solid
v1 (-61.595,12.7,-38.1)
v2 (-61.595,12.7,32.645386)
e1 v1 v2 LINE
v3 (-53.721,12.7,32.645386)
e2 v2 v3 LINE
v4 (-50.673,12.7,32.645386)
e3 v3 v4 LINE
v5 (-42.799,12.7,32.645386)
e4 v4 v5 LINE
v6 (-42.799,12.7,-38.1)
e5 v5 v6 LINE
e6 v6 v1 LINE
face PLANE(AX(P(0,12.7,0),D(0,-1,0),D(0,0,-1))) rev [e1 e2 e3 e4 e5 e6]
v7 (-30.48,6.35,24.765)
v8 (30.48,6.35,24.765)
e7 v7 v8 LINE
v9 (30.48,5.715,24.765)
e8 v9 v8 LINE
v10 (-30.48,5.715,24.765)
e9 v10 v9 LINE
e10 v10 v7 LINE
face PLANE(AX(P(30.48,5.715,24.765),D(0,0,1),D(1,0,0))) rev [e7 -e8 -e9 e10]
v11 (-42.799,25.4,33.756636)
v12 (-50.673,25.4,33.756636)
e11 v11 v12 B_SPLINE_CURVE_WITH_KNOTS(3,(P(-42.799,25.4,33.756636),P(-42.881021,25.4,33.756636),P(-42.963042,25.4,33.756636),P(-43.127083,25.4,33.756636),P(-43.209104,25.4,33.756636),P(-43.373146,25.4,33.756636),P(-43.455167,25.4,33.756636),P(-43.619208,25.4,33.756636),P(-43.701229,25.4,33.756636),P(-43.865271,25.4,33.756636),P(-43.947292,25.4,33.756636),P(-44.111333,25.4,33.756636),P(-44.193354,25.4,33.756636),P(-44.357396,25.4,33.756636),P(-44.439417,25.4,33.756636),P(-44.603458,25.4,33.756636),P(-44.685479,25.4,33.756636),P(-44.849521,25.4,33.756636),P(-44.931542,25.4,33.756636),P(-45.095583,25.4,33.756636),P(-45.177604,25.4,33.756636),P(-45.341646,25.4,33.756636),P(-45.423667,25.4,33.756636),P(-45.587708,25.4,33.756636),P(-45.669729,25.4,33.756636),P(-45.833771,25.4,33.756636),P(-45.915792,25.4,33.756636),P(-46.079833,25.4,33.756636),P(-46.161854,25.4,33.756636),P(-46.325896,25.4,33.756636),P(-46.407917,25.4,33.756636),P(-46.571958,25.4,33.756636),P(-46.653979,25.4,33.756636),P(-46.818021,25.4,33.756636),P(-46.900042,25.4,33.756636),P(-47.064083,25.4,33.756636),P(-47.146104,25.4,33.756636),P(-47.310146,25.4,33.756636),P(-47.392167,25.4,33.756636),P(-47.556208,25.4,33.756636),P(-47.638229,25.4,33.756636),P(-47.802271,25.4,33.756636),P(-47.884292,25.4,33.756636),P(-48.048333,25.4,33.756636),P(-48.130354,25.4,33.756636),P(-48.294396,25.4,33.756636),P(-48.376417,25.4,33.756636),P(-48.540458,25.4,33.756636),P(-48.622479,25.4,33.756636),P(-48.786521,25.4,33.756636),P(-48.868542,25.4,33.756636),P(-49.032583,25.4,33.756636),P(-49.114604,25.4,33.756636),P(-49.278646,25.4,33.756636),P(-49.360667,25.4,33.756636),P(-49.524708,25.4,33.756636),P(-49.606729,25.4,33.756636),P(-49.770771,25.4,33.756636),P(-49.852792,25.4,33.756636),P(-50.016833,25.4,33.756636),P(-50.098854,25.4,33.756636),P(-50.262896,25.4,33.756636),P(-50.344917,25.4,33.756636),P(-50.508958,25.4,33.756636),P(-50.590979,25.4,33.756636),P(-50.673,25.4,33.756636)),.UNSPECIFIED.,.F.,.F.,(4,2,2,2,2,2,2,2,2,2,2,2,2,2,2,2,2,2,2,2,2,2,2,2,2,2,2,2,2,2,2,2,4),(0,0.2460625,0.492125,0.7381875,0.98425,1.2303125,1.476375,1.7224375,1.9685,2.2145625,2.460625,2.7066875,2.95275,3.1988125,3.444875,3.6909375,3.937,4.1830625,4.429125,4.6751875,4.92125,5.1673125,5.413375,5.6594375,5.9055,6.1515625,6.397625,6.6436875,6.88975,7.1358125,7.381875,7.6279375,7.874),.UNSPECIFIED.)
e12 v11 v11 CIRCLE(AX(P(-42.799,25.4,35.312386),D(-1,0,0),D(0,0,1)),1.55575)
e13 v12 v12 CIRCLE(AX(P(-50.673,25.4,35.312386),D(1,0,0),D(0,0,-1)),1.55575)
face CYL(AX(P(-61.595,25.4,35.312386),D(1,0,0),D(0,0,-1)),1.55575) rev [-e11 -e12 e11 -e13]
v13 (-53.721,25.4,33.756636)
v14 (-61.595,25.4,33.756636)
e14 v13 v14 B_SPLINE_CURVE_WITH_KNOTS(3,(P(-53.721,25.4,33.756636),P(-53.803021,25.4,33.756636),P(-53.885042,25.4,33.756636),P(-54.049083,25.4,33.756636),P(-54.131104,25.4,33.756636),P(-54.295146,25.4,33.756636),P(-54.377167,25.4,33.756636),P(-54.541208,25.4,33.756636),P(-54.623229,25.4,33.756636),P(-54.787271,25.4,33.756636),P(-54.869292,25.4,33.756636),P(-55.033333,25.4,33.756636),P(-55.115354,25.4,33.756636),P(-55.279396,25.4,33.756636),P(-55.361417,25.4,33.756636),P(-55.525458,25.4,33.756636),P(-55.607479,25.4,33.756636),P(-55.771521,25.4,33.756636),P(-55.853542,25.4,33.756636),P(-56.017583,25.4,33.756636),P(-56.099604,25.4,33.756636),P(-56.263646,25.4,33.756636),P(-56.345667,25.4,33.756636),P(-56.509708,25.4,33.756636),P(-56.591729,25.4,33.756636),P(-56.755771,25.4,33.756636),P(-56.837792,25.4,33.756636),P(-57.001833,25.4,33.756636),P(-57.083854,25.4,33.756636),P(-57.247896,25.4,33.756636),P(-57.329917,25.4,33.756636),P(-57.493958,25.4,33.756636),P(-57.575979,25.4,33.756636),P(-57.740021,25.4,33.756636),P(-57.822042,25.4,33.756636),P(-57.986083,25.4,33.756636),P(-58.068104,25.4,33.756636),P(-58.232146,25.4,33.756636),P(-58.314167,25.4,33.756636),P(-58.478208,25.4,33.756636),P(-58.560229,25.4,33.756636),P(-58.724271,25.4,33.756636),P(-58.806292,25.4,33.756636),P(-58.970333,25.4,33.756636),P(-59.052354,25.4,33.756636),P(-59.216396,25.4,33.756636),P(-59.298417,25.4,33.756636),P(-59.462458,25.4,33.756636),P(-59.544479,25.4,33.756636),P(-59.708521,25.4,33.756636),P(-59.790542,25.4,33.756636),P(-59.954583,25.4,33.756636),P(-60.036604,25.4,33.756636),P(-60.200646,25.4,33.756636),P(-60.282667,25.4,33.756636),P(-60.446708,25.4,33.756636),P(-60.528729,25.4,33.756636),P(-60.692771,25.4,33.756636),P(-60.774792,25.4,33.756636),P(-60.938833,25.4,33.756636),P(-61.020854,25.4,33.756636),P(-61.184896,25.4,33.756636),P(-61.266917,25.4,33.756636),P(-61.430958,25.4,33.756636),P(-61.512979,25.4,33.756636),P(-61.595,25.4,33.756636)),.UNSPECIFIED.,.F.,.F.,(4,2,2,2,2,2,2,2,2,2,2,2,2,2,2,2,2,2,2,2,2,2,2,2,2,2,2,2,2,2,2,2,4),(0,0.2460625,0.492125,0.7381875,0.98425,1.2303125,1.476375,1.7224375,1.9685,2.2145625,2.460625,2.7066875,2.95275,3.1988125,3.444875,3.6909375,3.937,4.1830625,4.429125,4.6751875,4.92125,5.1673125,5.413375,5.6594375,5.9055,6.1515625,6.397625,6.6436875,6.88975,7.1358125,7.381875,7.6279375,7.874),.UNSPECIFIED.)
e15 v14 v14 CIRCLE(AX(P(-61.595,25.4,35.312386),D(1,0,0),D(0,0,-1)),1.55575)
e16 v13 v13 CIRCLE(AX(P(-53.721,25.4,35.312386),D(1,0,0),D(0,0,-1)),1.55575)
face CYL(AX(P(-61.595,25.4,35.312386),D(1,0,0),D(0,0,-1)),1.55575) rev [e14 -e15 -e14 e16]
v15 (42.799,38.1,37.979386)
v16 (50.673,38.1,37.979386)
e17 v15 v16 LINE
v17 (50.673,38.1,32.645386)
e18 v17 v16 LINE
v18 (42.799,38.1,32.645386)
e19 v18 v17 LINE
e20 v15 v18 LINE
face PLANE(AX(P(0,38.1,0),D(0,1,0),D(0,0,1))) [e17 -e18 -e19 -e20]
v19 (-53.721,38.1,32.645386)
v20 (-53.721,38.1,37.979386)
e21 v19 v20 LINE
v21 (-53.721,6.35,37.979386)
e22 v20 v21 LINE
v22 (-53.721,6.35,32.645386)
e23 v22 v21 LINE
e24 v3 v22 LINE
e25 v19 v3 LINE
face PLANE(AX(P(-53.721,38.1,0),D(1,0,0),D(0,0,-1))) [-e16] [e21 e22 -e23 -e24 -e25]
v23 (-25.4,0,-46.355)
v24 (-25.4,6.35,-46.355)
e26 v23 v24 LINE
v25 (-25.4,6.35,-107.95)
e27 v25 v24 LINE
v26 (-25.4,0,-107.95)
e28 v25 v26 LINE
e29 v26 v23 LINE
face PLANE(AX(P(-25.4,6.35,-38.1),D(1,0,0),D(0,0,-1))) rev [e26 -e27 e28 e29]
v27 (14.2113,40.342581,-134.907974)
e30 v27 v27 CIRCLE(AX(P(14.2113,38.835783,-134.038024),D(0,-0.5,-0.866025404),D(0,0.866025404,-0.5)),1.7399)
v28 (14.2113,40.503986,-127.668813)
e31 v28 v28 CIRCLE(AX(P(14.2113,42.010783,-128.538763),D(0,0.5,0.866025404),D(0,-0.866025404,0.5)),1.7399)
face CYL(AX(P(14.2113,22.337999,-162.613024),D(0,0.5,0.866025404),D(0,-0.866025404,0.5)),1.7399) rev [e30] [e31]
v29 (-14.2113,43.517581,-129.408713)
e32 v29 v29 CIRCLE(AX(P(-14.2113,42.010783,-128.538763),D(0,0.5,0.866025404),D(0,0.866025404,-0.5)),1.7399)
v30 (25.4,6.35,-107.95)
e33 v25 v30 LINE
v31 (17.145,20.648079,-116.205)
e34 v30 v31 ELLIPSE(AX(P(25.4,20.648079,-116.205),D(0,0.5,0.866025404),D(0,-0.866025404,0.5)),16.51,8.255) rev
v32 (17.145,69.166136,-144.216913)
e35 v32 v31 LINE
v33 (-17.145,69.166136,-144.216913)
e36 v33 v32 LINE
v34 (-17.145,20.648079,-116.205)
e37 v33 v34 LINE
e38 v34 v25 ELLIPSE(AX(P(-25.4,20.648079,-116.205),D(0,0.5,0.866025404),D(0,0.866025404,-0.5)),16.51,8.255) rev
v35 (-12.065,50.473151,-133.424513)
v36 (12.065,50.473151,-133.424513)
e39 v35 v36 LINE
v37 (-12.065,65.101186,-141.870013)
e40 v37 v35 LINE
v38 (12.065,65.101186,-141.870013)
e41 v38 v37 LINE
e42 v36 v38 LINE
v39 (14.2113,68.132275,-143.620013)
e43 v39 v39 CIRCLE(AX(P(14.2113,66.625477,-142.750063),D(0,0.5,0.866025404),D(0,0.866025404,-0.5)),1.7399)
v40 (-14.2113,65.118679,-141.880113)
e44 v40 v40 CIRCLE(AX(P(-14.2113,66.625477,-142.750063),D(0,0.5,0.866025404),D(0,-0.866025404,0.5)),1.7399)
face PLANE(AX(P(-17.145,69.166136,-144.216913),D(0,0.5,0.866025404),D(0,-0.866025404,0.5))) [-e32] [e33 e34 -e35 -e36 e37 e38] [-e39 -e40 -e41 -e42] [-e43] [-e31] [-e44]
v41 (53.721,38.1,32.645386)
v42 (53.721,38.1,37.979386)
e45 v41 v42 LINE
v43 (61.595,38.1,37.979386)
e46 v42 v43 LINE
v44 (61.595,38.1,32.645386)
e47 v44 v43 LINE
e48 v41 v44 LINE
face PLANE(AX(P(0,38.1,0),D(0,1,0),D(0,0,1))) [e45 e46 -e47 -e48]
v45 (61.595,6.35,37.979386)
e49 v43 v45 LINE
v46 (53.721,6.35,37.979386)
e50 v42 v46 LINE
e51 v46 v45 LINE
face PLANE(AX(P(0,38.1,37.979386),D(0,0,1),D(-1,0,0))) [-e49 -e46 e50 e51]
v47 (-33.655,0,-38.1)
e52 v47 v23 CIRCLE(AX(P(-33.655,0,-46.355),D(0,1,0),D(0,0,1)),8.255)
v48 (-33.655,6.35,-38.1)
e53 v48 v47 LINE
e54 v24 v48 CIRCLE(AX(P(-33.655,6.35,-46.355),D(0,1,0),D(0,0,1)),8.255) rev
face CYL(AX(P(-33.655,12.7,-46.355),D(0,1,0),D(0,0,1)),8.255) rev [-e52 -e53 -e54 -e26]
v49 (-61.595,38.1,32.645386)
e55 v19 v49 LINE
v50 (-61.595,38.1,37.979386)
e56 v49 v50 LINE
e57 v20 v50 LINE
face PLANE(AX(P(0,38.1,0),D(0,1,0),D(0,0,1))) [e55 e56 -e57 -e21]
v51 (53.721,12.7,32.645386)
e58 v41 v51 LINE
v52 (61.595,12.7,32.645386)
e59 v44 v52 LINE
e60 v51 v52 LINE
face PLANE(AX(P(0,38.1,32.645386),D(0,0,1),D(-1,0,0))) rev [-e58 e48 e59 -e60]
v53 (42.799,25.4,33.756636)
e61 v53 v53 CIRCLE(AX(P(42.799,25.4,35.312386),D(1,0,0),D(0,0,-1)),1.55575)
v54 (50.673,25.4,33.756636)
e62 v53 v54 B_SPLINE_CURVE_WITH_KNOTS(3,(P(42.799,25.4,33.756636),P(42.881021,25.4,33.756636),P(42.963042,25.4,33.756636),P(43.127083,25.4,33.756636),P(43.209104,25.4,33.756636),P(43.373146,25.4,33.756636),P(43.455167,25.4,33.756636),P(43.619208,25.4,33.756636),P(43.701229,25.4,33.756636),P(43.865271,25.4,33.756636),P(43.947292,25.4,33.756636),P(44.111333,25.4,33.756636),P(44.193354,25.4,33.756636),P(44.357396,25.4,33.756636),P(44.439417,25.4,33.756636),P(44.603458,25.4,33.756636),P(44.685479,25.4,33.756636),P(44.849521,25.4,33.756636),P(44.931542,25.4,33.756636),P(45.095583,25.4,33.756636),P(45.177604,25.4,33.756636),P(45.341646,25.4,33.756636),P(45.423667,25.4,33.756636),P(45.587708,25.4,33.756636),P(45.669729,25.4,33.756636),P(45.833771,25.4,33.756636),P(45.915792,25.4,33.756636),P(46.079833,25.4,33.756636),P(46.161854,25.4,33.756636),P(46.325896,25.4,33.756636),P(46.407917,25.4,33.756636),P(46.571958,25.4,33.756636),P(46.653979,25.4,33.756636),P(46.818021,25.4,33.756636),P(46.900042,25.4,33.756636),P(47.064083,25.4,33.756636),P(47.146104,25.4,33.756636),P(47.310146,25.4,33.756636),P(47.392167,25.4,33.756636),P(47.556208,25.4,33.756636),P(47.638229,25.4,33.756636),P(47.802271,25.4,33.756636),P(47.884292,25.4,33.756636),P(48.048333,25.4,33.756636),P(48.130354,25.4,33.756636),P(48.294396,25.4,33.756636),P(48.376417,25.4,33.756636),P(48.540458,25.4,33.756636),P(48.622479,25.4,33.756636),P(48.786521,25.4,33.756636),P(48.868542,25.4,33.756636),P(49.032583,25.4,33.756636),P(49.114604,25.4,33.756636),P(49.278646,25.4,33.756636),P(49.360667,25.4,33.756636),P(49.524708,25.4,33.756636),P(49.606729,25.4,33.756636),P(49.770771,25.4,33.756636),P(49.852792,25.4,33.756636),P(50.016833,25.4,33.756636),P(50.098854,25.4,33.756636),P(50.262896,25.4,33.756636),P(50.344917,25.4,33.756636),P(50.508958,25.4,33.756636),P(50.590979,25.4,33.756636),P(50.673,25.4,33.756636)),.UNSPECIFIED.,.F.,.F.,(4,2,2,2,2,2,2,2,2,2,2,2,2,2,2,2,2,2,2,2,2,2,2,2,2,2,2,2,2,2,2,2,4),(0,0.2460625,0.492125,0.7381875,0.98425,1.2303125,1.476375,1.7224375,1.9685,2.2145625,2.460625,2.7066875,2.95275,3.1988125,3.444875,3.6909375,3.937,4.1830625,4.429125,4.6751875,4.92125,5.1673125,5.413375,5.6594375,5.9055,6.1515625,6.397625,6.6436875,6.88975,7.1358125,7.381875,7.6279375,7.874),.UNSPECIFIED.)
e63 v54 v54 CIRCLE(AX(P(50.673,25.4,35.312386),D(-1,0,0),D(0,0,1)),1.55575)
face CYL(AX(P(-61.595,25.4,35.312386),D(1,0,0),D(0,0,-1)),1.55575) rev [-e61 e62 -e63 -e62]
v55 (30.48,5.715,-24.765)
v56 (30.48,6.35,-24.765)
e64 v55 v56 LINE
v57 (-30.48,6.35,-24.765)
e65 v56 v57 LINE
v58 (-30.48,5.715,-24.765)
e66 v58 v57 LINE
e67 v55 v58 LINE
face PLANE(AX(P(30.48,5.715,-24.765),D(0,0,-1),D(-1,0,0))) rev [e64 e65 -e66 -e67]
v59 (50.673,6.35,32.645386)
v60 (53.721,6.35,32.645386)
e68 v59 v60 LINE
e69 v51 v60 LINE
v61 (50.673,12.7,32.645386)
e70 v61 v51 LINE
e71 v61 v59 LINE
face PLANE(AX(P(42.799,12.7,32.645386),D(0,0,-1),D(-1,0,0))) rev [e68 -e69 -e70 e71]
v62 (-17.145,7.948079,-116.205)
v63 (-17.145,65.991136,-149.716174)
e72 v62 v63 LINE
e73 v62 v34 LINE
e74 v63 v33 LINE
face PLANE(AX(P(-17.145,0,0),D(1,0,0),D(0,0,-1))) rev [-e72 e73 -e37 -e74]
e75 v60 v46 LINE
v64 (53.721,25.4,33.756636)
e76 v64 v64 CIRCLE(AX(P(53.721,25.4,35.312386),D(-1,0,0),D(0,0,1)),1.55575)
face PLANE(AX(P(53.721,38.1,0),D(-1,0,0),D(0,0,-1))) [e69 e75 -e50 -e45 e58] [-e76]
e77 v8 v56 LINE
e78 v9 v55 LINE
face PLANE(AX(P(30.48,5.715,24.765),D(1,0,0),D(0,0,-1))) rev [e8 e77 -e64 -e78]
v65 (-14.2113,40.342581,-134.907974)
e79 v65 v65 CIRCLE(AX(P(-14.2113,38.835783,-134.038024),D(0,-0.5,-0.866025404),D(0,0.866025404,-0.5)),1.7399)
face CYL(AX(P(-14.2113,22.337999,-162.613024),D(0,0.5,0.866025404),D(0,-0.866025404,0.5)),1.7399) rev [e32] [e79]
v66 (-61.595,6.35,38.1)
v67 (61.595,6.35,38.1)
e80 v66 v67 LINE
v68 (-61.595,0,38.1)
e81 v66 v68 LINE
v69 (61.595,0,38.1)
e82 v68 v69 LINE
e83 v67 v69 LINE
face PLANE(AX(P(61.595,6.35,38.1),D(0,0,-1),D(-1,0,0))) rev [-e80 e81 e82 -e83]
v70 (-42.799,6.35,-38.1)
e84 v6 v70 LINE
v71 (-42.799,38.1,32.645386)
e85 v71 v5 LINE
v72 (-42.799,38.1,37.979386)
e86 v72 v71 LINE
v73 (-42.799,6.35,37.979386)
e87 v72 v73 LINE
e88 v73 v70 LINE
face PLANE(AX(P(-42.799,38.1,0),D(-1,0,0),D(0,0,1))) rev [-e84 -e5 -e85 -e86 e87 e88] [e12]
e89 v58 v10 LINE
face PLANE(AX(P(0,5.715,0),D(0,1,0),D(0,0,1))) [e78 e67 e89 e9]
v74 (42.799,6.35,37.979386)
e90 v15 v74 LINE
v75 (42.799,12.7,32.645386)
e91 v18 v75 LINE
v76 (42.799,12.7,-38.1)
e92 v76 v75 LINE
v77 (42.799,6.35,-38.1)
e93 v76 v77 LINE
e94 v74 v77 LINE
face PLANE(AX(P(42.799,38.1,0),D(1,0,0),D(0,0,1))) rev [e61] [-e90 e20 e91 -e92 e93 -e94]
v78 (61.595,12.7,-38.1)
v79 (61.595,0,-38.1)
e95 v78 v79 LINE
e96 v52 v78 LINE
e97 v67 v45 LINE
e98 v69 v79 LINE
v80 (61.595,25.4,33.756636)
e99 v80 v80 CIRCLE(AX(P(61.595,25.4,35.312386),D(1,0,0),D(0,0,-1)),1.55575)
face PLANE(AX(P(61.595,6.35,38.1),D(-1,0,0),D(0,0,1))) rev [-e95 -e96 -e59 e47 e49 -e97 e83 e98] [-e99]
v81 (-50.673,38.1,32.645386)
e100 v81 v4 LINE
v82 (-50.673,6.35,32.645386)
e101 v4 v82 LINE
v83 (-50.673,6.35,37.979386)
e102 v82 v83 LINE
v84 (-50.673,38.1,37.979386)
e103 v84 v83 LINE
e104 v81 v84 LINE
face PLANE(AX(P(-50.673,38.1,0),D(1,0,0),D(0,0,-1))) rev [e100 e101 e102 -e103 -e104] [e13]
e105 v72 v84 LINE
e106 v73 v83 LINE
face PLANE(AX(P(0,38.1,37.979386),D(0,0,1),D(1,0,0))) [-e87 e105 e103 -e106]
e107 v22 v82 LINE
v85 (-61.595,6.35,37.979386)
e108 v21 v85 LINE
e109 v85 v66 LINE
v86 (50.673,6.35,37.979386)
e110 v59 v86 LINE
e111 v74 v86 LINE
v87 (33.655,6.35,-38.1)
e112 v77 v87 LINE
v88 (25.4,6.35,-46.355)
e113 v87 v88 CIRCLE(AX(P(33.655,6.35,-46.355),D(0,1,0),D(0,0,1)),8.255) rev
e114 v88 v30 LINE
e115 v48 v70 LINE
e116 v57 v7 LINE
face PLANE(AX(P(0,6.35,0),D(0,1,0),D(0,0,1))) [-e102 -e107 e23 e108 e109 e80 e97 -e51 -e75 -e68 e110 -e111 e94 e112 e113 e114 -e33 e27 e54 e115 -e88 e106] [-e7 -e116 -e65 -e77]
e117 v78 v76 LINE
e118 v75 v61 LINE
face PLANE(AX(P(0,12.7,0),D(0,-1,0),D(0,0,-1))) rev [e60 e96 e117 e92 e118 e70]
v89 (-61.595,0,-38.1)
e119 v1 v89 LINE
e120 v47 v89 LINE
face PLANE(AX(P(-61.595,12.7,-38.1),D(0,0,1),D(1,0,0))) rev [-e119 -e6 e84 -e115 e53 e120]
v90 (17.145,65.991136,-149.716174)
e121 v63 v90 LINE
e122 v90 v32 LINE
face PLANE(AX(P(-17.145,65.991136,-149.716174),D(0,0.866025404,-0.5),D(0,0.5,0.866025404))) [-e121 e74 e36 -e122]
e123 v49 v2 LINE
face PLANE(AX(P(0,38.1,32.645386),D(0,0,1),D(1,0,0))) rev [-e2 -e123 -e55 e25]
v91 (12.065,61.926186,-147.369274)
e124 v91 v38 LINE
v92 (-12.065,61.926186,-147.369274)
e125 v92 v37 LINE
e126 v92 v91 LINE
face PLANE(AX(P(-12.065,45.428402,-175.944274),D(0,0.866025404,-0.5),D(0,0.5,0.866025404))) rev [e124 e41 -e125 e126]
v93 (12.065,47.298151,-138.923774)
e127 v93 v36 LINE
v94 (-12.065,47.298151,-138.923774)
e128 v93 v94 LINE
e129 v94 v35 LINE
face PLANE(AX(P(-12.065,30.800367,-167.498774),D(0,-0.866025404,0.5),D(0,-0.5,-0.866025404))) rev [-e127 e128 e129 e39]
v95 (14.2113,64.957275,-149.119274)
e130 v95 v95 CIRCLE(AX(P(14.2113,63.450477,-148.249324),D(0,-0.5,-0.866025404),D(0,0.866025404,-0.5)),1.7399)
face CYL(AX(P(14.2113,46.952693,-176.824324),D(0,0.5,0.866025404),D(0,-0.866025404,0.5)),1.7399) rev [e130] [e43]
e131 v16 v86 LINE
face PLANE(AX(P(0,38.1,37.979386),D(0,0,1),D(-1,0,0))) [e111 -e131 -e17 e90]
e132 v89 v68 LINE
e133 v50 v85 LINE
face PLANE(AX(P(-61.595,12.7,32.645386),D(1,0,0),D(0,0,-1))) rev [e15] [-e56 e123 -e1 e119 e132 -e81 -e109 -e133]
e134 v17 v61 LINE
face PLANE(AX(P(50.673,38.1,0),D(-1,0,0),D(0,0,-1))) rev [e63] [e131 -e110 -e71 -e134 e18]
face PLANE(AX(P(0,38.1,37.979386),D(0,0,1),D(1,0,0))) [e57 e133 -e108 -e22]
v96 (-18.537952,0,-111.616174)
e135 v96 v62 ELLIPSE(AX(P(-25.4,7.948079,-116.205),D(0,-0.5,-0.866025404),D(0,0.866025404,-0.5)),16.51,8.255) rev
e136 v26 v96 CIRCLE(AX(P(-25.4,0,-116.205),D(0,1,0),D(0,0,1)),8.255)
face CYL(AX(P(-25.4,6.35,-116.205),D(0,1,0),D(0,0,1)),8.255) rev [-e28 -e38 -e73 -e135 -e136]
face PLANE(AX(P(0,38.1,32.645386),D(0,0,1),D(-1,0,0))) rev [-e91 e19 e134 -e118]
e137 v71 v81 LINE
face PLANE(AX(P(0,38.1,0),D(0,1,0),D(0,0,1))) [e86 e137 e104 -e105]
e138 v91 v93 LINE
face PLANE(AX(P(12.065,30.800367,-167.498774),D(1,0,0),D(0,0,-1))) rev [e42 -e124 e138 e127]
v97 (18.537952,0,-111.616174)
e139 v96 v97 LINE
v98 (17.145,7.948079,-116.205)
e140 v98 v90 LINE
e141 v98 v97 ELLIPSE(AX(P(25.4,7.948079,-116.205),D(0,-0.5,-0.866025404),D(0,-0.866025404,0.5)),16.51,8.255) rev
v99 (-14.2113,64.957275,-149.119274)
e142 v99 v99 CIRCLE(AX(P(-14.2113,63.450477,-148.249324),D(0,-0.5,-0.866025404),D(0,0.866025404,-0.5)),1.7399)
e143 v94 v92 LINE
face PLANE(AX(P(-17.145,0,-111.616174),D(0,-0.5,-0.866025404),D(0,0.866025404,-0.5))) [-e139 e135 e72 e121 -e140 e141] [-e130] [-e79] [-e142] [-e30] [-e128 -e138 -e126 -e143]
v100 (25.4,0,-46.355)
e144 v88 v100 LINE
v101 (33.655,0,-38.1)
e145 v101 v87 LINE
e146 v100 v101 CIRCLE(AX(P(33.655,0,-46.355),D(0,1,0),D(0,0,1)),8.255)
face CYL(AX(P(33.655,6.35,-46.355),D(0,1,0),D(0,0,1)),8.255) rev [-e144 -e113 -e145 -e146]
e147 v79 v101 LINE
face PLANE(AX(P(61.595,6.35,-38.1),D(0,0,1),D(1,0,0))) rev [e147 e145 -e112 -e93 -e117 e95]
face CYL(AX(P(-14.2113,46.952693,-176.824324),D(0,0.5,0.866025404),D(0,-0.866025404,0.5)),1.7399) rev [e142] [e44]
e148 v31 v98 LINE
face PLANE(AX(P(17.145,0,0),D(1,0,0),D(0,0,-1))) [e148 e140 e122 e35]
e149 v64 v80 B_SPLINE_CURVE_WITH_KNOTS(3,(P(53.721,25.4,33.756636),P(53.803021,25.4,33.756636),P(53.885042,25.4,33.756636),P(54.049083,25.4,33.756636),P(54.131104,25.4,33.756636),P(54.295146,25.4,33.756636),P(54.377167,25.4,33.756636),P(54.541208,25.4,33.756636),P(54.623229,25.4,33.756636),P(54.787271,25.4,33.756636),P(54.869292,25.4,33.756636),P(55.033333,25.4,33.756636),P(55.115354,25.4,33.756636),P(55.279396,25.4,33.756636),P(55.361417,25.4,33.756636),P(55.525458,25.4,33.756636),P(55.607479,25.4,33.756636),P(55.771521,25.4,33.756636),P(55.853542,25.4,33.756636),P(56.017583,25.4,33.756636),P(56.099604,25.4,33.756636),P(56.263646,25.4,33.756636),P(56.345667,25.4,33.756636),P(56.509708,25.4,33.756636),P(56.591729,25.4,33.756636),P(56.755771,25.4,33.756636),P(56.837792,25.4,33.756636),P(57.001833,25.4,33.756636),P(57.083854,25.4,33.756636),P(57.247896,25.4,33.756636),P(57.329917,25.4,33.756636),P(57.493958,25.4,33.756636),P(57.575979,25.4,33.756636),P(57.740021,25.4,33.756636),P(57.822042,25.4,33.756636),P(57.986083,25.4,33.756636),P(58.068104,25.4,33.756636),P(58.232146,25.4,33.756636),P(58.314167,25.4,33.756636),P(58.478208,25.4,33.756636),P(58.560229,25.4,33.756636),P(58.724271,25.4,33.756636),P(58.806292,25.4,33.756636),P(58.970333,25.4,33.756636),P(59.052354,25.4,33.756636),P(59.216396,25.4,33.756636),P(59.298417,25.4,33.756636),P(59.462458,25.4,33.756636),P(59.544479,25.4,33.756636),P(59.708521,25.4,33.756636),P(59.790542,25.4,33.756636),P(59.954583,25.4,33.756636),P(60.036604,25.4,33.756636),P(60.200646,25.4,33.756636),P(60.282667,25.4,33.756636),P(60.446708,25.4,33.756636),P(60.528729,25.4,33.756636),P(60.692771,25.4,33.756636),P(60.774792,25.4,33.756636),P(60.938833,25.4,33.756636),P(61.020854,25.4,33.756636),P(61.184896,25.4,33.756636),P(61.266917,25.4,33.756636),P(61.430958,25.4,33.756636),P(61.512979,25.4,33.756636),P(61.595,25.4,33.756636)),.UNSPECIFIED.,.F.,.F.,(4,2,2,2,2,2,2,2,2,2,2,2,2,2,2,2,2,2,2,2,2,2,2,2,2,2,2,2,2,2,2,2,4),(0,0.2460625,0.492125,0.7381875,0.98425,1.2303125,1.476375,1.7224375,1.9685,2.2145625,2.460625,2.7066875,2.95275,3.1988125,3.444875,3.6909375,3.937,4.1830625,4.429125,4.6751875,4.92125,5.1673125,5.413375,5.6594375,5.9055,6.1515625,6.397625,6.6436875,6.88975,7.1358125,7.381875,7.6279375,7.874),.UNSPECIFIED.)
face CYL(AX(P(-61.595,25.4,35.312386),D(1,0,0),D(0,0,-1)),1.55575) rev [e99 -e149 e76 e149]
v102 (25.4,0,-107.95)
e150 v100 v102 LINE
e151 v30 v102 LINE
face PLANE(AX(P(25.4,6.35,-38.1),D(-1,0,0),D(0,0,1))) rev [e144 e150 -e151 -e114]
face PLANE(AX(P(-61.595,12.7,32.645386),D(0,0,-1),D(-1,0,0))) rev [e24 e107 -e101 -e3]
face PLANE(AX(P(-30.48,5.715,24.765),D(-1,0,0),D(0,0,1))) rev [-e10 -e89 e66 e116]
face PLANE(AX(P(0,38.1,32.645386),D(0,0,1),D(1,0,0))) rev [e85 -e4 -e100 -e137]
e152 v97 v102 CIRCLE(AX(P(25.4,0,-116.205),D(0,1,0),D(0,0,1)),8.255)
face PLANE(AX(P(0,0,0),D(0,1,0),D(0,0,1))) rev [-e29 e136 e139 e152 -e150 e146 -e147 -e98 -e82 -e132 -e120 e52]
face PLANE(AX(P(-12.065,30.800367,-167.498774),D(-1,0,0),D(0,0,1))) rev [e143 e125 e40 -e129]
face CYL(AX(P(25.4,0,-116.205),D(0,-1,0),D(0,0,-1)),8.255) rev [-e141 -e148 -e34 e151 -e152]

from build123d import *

# Parameters (mm, degrees)
BOSS_EXTRUDE1_DEPTH   = 6.35
SKETCH2_W             = 60.96
SKETCH2_H             = 49.53
CUT_EXTRUDE1_DEPTH    = 0.635
SKETCH5_W             = 7.874
SKETCH5_H             = 5.334
BOSS_EXTRUDE2_DEPTH   = 31.75
BOSS_EXTRUDE2_2_DEPTH = 31.75
SKETCH7_R             = 1.55575
CUT_EXTRUDE2_DEPTH    = 169.168334118
BOSS_EXTRUDE3_START   = -8.255
BOSS_EXTRUDE3_DEPTH   = 34.29
SKETCH9_R             = 1.7399
SKETCH9_W             = 24.13
SKETCH9_H             = 16.891
CUT_EXTRUDE3_DEPTH    = 175.333671147
SKETCH11_W            = 18.796
SKETCH11_H            = 70.745386066
BOSS_EXTRUDE6_DEPTH   = 6.35
FILLET1_R             = 8.255


with BuildPart() as part:
    # Sketch1 → Boss-Extrude1 (new body)
    with BuildSketch(Plane(origin=(0, 0, 0), x_dir=(1, 0, 0), z_dir=(0, 1, 0))):
        Polygon((-25.4, 38.1), (-61.595, 38.1), (-61.595, -38.1), (61.595, -38.1), (61.595, 38.1), (25.4, 38.1), (25.4, 107.95), (-25.4, 107.95), align=None)
    extrude(amount=BOSS_EXTRUDE1_DEPTH)

    # Sketch2 → Cut-Extrude1 (cut)
    with BuildSketch(Plane(origin=(0, 6.35, 0), x_dir=(1, 0, 0), z_dir=(0, 1, 0))):
        Rectangle(SKETCH2_W, SKETCH2_H)
    extrude(amount=-CUT_EXTRUDE1_DEPTH, mode=Mode.SUBTRACT)


with BuildPart() as body_2:
    # Sketch5 → Boss-Extrude2 (new body)
    with BuildSketch(Plane(origin=(0, 6.35, 0), x_dir=(1, 0, 0), z_dir=(0, 1, 0))):
        with Locations((-46.736, -35.312386066)):
            Rectangle(SKETCH5_W, SKETCH5_H)
    boss_extrude2 = extrude(amount=BOSS_EXTRUDE2_DEPTH)


with BuildPart() as body_3:
    # Sketch5 → Boss-Extrude2 2 (new body)
    with BuildSketch(Plane(origin=(0, 6.35, 0), x_dir=(1, 0, 0), z_dir=(0, 1, 0))):
        with Locations((-57.658, -35.312386066)):
            Rectangle(SKETCH5_W, SKETCH5_H)
    boss_extrude2_2 = extrude(amount=BOSS_EXTRUDE2_2_DEPTH)


with BuildPart() as part_1:
    add(part.part)

    # Mirror4: Boss-Extrude2, Boss-Extrude2 2 across plane
    add(boss_extrude2.mirror(Plane(origin=(0, 0, 0), x_dir=(0, 0, 1), z_dir=(1, 0, 0))))
    add(boss_extrude2_2.mirror(Plane(origin=(0, 0, 0), x_dir=(0, 0, 1), z_dir=(1, 0, 0))))


with BuildPart() as cut_extrude2_tool:
    # Sketch7 → Cut-Extrude2 (new, through all)
    with BuildSketch(Plane(origin=(61.595, 0, 0), x_dir=(0, 0, -1), z_dir=(1, 0, 0))):
        with Locations((-35.312386066, 25.4)):
            Circle(SKETCH7_R)
    extrude(amount=-CUT_EXTRUDE2_DEPTH)


with BuildPart() as part_2:
    add(part_1.part)

    # Cut-Extrude2: cut by cut_extrude2_tool
    add(cut_extrude2_tool.part, mode=Mode.SUBTRACT)

    # Sketch8 → Boss-Extrude3 (add)
    with BuildSketch(Plane(origin=(25.4, 0, 0), x_dir=(0, 0, -1), z_dir=(1, 0, 0)).offset(BOSS_EXTRUDE3_START)):
        Polygon((111.616174209, 0), (149.716174209, 65.991135768), (144.216912895, 69.166135768), (107.95, 6.35), (107.95, 0), align=None)
    extrude(amount=-BOSS_EXTRUDE3_DEPTH)

    # Sketch9 → Cut-Extrude3 (cut, through all)
    with BuildSketch(Plane(origin=(0, -45.156221169, -78.212869343), x_dir=(1, 0, 0), z_dir=(0, 0.49999999999997874, 0.866025403784451))):
        with Locations(Location((-14.2113, 129.074387105, 0), (0, 0, 270))):
            Circle(SKETCH9_R)
        with Locations(Location((14.2113, 129.074387105, 0), (0, 0, 90))):
            Circle(SKETCH9_R)
        with Locations(Location((14.2113, 100.651787105, 0), (0, 0, 270))):
            Circle(SKETCH9_R)
        with Locations(Location((-14.2113, 100.651787105, 0), (0, 0, 90))):
            Circle(SKETCH9_R)
        with Locations((0, 118.868787105)):
            Rectangle(SKETCH9_W, SKETCH9_H)
    extrude(amount=-CUT_EXTRUDE3_DEPTH, mode=Mode.SUBTRACT)



with BuildPart() as body_2_1:
    add(body_2.part)

    # Cut-Extrude2: cut by cut_extrude2_tool
    add(cut_extrude2_tool.part, mode=Mode.SUBTRACT)


with BuildPart() as body_3_1:
    add(body_3.part)

    # Cut-Extrude2: cut by cut_extrude2_tool
    add(cut_extrude2_tool.part, mode=Mode.SUBTRACT)


with BuildPart() as part_3:
    add(part_2.part)

    add(body_2_1.part)  # Boss-Extrude6 merges body 2

    add(body_3_1.part)  # Boss-Extrude6 merges body 3
    # Sketch11 → Boss-Extrude6 (add)
    with BuildSketch(Plane(origin=(0, 6.35, 0), x_dir=(1, 0, 0), z_dir=(0, 1, 0))):
        with Locations((-52.197, 2.727306967)):
            Rectangle(SKETCH11_W, SKETCH11_H)
        with Locations((52.197, 2.727306967)):
            Rectangle(SKETCH11_W, SKETCH11_H)
    extrude(amount=BOSS_EXTRUDE6_DEPTH)

    # Fillet1
    # the kernel refuses this fillet: 8.255 mm, written as the material it adds along each edge
    with BuildSketch(Plane(origin=(-17.145, 26.9875, -107.95), x_dir=(-1, 0, 0), z_dir=(0, -1, 0))) as fillet1_piece_1_section:
        with BuildLine():
            CenterArc((FILLET1_R, FILLET1_R), FILLET1_R, 180, 90)
            Line((0, FILLET1_R), (0, 0))
            Line((0, 0), (FILLET1_R, 0))
        make_face()
    fillet1_piece_1 = extrude(amount=26.9875, mode=Mode.PRIVATE)
    fillet1_piece_1 = split(fillet1_piece_1, bisect_by=Plane(origin=(-18.026106342, 6.35, -111.490654818), z_dir=(0, 1, 0)), keep=Keep.TOP, mode=Mode.PRIVATE)
    fillet1_piece_1 = split(fillet1_piece_1, bisect_by=Plane(origin=(-18.026106342, 10.193700171, -110.169161328), z_dir=(0, -0.4999999999999879, -0.8660254037844457)), keep=Keep.TOP, mode=Mode.PRIVATE)
    fillet1_piece_1 = split(fillet1_piece_1, bisect_by=Plane(origin=(-18.026106342, 7.018700171, -115.668422642), z_dir=(0, 0.49999999999999845, 0.8660254037844396)), keep=Keep.TOP, mode=Mode.PRIVATE)
    add(fillet1_piece_1)
    with BuildSketch(Plane(origin=(-17.145, 6.35, -107.95), x_dir=(-1, 0, 0), z_dir=(0, -1, 0))) as fillet1_piece_2_section:
        with BuildLine():
            CenterArc((FILLET1_R, FILLET1_R), FILLET1_R, 180, 90)
            Line((0, FILLET1_R), (0, 0))
            Line((0, 0), (FILLET1_R, 0))
        make_face()
    fillet1_piece_2 = extrude(amount=6.35, mode=Mode.PRIVATE)
    fillet1_piece_2 = split(fillet1_piece_2, bisect_by=Plane(origin=(-19.126244344, 4.717934574, -107.007726587), z_dir=(0, -0.4999999999999879, -0.8660254037844457)), keep=Keep.TOP, mode=Mode.PRIVATE)
    fillet1_piece_2 = split(fillet1_piece_2, bisect_by=Plane(origin=(-19.126244344, 1.542934574, -112.506987901), z_dir=(0, 0.49999999999999845, 0.8660254037844396)), keep=Keep.TOP, mode=Mode.PRIVATE)
    add(fillet1_piece_2)
    with BuildSketch(Plane(origin=(17.145, 26.9875, -107.95), x_dir=(1, 0, 0), z_dir=(0, -1, 0))) as fillet1_piece_3_section:
        with BuildLine():
            CenterArc((FILLET1_R, -FILLET1_R), FILLET1_R, 90, 90)
            Line((0, -FILLET1_R), (0, 0))
            Line((0, 0), (FILLET1_R, 0))
        make_face()
    fillet1_piece_3 = extrude(amount=26.9875, mode=Mode.PRIVATE)
    fillet1_piece_3 = split(fillet1_piece_3, bisect_by=Plane(origin=(18.026106342, 6.35, -111.490654818), z_dir=(0, 1, 0)), keep=Keep.TOP, mode=Mode.PRIVATE)
    fillet1_piece_3 = split(fillet1_piece_3, bisect_by=Plane(origin=(18.026106342, 10.193700171, -110.169161328), z_dir=(0, -0.4999999999999879, -0.8660254037844457)), keep=Keep.TOP, mode=Mode.PRIVATE)
    fillet1_piece_3 = split(fillet1_piece_3, bisect_by=Plane(origin=(18.026106342, 7.018700171, -115.668422642), z_dir=(0, 0.49999999999999845, 0.8660254037844396)), keep=Keep.TOP, mode=Mode.PRIVATE)
    add(fillet1_piece_3)
    with BuildSketch(Plane(origin=(17.145, 6.35, -107.95), x_dir=(1, 0, 0), z_dir=(0, -1, 0))) as fillet1_piece_4_section:
        with BuildLine():
            CenterArc((FILLET1_R, -FILLET1_R), FILLET1_R, 90, 90)
            Line((0, -FILLET1_R), (0, 0))
            Line((0, 0), (FILLET1_R, 0))
        make_face()
    fillet1_piece_4 = extrude(amount=6.35, mode=Mode.PRIVATE)
    fillet1_piece_4 = split(fillet1_piece_4, bisect_by=Plane(origin=(19.126244344, 4.717934574, -107.007726587), z_dir=(0, -0.4999999999999879, -0.8660254037844457)), keep=Keep.TOP, mode=Mode.PRIVATE)
    fillet1_piece_4 = split(fillet1_piece_4, bisect_by=Plane(origin=(19.126244344, 1.542934574, -112.506987901), z_dir=(0, 0.49999999999999845, 0.8660254037844396)), keep=Keep.TOP, mode=Mode.PRIVATE)
    add(fillet1_piece_4)
    with BuildSketch(Plane(origin=(-25.4, 0, -38.1), x_dir=(-1, 0, 0), z_dir=(0, 1, 0)), Plane(origin=(25.4, 0, -38.1), x_dir=(0, 0, -1), z_dir=(0, 1, 0))) as fillet1_piece_5:
        with BuildLine():
            CenterArc((FILLET1_R, -FILLET1_R), FILLET1_R, 90, 90)
            Line((0, -FILLET1_R), (0, 0))
            Line((0, 0), (FILLET1_R, 0))
        make_face()
    extrude(amount=6.35)


solid = part_3.part
